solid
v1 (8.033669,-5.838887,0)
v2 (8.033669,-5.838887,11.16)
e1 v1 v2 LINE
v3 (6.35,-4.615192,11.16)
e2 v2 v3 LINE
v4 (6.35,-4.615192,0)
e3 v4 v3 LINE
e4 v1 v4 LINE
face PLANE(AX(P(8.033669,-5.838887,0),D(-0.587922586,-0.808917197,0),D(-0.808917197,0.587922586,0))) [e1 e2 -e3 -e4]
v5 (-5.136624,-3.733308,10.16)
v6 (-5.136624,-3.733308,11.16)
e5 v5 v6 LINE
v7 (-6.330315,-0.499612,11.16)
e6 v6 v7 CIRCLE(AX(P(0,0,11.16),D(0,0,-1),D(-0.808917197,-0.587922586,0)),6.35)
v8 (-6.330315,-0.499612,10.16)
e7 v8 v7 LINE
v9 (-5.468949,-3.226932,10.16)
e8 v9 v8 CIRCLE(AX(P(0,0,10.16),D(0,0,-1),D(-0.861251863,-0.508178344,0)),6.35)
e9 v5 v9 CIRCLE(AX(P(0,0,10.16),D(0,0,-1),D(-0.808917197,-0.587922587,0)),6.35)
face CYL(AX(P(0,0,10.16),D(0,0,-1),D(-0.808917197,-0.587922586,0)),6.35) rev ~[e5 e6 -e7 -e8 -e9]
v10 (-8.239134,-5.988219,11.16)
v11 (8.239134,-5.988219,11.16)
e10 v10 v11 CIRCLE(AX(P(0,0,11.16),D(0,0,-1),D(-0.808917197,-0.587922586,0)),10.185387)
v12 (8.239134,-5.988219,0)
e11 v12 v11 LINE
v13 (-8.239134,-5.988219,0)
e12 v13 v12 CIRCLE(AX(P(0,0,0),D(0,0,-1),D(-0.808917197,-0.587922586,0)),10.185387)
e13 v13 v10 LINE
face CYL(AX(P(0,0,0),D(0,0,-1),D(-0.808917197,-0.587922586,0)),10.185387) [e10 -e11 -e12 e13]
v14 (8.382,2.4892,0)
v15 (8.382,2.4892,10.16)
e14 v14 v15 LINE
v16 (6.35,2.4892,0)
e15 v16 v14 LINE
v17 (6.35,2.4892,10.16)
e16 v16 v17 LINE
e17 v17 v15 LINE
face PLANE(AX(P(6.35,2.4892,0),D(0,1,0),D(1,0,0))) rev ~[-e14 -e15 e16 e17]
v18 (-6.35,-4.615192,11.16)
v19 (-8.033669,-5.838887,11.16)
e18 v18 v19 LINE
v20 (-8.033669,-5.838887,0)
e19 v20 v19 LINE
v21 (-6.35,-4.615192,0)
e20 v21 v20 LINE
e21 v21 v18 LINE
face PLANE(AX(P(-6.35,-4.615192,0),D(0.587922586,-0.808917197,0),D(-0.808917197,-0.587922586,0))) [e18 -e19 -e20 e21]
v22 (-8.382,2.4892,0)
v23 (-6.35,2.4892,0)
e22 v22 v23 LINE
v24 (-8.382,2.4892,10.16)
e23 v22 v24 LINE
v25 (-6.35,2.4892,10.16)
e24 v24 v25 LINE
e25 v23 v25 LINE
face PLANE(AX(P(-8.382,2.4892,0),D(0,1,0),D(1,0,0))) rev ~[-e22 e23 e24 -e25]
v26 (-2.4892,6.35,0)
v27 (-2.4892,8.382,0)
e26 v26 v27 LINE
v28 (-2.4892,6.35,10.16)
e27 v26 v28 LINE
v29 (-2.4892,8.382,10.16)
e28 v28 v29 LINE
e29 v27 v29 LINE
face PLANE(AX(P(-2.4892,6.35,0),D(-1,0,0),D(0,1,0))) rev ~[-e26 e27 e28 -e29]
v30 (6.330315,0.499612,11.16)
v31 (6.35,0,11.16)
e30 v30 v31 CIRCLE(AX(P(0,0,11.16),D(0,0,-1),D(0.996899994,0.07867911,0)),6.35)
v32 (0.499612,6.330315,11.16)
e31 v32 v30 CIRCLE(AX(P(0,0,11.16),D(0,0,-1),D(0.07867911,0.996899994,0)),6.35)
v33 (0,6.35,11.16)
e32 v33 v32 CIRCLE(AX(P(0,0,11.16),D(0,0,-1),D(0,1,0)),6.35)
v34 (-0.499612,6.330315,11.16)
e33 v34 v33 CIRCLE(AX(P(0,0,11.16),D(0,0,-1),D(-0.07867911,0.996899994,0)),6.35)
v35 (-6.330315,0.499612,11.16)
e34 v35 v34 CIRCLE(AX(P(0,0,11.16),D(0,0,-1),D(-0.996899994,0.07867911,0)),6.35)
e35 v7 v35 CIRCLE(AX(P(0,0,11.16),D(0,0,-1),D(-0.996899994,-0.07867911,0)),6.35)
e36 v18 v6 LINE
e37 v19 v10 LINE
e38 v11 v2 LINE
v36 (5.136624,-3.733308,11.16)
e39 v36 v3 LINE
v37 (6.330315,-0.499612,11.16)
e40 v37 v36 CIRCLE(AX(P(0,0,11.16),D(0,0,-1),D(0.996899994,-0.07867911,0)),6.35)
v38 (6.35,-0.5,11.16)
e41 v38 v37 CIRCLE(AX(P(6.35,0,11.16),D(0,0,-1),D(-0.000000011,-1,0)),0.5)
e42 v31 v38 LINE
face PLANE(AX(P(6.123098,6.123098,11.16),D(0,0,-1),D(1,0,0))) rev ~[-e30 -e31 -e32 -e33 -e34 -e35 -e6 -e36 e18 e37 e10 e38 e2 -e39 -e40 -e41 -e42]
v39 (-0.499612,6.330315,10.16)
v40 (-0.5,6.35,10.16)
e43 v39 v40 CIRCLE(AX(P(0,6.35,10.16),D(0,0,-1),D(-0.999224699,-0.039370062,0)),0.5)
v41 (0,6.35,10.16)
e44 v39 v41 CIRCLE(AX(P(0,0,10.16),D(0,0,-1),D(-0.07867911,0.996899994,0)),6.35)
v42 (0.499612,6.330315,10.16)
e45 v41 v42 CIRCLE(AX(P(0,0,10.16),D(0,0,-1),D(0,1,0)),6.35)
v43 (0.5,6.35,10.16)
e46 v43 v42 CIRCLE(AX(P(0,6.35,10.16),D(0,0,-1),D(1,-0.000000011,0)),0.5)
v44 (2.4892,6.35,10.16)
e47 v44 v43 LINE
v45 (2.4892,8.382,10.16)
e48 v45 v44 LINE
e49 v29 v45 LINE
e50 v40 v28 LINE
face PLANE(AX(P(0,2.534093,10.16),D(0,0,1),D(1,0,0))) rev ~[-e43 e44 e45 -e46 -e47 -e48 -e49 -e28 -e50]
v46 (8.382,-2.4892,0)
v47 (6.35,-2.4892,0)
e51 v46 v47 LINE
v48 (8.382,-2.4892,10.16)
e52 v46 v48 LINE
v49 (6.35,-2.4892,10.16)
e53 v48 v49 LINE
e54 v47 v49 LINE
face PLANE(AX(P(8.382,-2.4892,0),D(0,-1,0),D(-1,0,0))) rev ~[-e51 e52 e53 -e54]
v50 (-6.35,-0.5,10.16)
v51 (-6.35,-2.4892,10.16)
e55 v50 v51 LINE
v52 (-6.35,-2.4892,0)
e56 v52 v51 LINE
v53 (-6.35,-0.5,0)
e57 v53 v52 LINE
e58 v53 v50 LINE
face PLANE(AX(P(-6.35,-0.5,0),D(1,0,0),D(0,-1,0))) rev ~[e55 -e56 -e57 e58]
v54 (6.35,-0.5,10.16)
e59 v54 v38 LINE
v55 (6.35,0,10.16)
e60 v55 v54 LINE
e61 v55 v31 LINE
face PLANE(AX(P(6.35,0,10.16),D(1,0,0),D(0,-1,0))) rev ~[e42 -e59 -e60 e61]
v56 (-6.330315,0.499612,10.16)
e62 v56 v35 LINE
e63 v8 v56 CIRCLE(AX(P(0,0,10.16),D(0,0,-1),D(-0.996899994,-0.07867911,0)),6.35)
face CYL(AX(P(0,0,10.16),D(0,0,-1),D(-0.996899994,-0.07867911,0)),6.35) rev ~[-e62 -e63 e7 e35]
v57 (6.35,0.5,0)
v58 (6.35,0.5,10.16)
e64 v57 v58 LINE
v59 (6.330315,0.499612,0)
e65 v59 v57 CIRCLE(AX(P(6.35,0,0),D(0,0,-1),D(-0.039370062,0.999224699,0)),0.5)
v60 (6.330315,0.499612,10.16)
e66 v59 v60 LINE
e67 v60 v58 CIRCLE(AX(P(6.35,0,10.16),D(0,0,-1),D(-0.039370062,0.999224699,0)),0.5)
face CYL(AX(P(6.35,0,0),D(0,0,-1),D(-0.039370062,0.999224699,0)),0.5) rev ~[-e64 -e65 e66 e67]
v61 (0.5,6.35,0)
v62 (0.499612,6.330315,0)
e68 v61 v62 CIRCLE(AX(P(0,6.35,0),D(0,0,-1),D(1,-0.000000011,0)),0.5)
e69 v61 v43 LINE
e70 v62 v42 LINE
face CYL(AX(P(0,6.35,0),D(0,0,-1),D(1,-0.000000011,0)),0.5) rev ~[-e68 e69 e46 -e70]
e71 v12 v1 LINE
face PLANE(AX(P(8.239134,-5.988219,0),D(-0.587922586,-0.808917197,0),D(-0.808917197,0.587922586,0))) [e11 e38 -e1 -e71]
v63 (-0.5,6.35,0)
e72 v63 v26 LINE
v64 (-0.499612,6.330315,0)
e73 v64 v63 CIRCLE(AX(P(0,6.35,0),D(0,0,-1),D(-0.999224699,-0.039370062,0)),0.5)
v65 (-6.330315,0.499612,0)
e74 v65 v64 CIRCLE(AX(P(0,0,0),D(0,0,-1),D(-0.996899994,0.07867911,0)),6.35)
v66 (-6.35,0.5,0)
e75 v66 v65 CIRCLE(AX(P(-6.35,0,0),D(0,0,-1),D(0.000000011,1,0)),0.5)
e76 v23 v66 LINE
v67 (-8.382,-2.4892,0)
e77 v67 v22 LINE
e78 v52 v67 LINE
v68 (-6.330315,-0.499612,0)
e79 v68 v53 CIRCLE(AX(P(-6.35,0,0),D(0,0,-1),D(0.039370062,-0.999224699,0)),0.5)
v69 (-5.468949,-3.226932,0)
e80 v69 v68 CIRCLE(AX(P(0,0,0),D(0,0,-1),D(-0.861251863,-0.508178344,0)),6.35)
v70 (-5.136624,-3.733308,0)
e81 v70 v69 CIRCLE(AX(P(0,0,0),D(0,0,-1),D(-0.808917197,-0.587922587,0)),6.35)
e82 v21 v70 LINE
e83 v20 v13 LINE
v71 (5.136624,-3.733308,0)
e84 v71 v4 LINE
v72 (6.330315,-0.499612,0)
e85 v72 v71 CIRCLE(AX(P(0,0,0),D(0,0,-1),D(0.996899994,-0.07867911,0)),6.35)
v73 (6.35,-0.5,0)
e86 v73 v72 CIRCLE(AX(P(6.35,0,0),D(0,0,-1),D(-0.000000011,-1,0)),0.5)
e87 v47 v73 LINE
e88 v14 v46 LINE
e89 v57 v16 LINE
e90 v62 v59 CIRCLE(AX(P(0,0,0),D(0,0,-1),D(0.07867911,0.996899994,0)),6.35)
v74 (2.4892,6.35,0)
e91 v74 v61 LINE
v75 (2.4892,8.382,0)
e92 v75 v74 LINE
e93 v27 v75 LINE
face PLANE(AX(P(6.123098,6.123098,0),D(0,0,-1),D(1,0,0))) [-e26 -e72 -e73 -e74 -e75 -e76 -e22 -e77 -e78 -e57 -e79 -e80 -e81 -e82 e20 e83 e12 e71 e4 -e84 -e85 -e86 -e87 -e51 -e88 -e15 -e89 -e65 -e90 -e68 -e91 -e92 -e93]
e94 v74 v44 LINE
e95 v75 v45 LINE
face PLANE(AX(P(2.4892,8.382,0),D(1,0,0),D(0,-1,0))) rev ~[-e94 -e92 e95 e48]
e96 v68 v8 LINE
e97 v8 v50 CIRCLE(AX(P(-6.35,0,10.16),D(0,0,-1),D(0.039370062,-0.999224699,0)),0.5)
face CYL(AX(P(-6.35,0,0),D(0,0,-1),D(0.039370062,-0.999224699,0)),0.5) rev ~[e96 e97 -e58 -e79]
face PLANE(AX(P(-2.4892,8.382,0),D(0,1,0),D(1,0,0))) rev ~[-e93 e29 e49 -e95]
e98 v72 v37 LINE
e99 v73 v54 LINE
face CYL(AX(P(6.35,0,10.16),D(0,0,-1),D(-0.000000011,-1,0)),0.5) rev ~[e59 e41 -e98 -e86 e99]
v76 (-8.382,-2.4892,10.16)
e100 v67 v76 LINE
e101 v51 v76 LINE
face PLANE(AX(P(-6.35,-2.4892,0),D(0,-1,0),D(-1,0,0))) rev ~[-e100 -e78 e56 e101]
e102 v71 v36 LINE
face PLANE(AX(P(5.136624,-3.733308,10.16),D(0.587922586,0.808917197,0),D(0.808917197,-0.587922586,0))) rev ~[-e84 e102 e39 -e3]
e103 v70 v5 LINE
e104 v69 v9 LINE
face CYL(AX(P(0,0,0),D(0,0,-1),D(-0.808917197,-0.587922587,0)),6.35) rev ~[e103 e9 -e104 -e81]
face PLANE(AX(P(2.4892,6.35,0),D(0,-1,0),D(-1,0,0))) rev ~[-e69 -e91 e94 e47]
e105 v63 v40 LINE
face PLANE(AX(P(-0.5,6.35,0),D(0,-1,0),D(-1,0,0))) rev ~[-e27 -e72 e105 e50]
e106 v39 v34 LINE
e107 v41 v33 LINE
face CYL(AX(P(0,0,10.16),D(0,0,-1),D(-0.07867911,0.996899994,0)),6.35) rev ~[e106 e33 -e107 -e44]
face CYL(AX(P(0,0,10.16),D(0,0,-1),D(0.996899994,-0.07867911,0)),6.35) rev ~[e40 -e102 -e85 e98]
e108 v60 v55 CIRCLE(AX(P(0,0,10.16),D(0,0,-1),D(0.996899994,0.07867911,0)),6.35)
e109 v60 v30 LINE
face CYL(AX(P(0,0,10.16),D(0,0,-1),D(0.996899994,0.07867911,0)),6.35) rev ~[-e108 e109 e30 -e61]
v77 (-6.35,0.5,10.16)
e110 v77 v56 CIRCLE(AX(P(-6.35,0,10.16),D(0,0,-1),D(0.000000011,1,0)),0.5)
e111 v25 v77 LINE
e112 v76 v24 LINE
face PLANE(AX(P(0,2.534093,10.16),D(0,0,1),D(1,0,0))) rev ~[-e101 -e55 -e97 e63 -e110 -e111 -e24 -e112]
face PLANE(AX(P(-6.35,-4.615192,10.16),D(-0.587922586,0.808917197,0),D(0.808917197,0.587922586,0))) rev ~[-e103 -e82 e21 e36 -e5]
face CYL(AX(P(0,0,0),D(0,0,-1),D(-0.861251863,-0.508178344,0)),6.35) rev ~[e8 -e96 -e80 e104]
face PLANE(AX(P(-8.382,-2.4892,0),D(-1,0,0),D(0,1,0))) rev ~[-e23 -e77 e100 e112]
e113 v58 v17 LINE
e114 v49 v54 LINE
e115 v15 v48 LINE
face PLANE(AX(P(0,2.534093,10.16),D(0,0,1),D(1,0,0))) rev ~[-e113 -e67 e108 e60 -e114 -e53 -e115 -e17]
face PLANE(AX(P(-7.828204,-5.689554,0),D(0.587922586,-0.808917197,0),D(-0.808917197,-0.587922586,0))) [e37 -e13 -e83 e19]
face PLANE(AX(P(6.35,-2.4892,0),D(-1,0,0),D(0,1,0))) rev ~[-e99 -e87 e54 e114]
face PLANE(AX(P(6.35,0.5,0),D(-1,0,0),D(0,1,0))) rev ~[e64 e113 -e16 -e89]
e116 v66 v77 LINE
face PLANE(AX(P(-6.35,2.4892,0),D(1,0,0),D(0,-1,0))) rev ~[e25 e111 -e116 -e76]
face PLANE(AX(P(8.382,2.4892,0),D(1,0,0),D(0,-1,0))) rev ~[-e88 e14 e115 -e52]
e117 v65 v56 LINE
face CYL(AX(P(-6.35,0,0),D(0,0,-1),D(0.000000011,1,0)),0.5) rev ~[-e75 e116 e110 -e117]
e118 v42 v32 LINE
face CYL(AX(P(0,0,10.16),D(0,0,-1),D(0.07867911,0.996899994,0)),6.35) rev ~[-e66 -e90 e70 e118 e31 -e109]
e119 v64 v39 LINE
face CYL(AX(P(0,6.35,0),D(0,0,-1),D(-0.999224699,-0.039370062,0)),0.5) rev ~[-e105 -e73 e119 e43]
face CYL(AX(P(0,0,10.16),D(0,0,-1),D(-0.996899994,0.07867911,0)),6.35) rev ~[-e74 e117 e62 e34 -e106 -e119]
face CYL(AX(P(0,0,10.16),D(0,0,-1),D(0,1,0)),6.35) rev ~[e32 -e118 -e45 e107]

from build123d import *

# Parameters (mm, degrees)
F1_DEPTH = 10.16
F2_R     = 3
F4_DEPTH = 1
F6_DEPTH = 11.16
F8_DEPTH = 11.16


with BuildPart() as f1:
    # F0 (on Top) → F1 (new body)
    with BuildSketch(Plane.XY):
        with BuildLine():
            Line((2.4892, 8.382), (2.4892, 6.35))
            Line((2.4892, 6.35), (0.5, 6.35))
            ThreePointArc((0.5, 6.35), (0.4999030778, 6.340155572), (0.499612349, 6.3303149606))
            ThreePointArc((0.499612349, 6.3303149606), (4.4901280605, 4.4901280605), (6.3303149606, 0.499612349))
            ThreePointArc((6.3303149606, 0.499612349), (6.340155572, 0.4999030778), (6.35, 0.5))
            Line((6.35, 0.5), (6.35, 2.4892))
            Line((6.35, 2.4892), (8.382, 2.4892))
            Line((8.382, 2.4892), (8.382, -2.4892))
            Line((8.382, -2.4892), (6.35, -2.4892))
            Line((6.35, -2.4892), (6.35, -0.5))
            ThreePointArc((6.35, -0.5), (6.340155572, -0.4999030778), (6.3303149606, -0.499612349))
            ThreePointArc((6.3303149606, -0.499612349), (5.9570857831, -2.1990063604), (5.1366242038, -3.733308424))
            Line((5.1366242038, -3.733308424), (6.35, -4.6151923037))
            ThreePointArc((6.35, -4.6151923037), (6.5628814967, -4.3070972197), (6.760827121, -3.9892))
            Line((6.760827121, -3.9892), (9.882, -3.9892))
            Line((9.882, -3.9892), (9.882, 3.9892))
            Line((9.882, 3.9892), (6.760827121, 3.9892))
            ThreePointArc((6.760827121, 3.9892), (5.5507882323, 5.5507882323), (3.9892, 6.760827121))
            Line((3.9892, 6.760827121), (3.9892, 9.882))
            Line((3.9892, 9.882), (-3.9892, 9.882))
            Line((-3.9892, 9.882), (-3.9892, 6.760827121))
            ThreePointArc((-3.9892, 6.760827121), (-5.5507882323, 5.5507882323), (-6.760827121, 3.9892))
            Line((-6.760827121, 3.9892), (-9.882, 3.9892))
            Line((-9.882, 3.9892), (-9.882, -3.9892))
            Line((-9.882, -3.9892), (-6.760827121, -3.9892))
            ThreePointArc((-6.760827121, -3.9892), (-6.5628814967, -4.3070972197), (-6.35, -4.6151923037))
            Line((-6.35, -4.6151923037), (-5.1366242038, -3.733308424))
            ThreePointArc((-5.1366242038, -3.733308424), (-5.3088277076, -3.4840850121), (-5.4689493272, -3.2269324841))
            ThreePointArc((-5.4689493272, -3.2269324841), (-6.0551819306, -1.9123994841), (-6.3303149606, -0.499612349))
            ThreePointArc((-6.3303149606, -0.499612349), (-6.340155572, -0.4999030778), (-6.35, -0.5))
            Line((-6.35, -0.5), (-6.35, -2.4892))
            Line((-6.35, -2.4892), (-8.382, -2.4892))
            Line((-8.382, -2.4892), (-8.382, 2.4892))
            Line((-8.382, 2.4892), (-6.35, 2.4892))
            Line((-6.35, 2.4892), (-6.35, 0.5))
            ThreePointArc((-6.35, 0.5), (-6.340155572, 0.4999030778), (-6.3303149606, 0.499612349))
            ThreePointArc((-6.3303149606, 0.499612349), (-4.4901280605, 4.4901280605), (-0.499612349, 6.3303149606))
            ThreePointArc((-0.499612349, 6.3303149606), (-0.4999030778, 6.340155572), (-0.5, 6.35))
            Line((-0.5, 6.35), (-2.4892, 6.35))
            Line((-2.4892, 6.35), (-2.4892, 8.382))
            Line((-2.4892, 8.382), (2.4892, 8.382))
        make_face()
    extrude(amount=F1_DEPTH)

    # F2
    f2_edges = [f1.edges().sort_by_distance(p)[0] for p in [
        (-3.9892, 9.882, 5.08),
        (3.9892, 9.882, 5.08),
        (-9.882, 3.9892, 5.08),
        (-9.882, -3.9892, 5.08),
        (9.882, 3.9892, 5.08),
        (9.882, -3.9892, 5.08),
    ]]
    fillet(f2_edges, radius=F2_R)

    # F3 (on face) → F4 (join)
    with BuildSketch(Plane.XY.offset(10.16)):
        with BuildLine():
            ThreePointArc((-3.9892, 6.760827121), (-5.5507882323, 5.5507882323), (-6.760827121, 3.9892))
            Line((-6.760827121, 3.9892), (-6.882, 3.9892))
            ThreePointArc((-6.882, 3.9892), (-9.0033203436, 3.1105203436), (-9.882, 0.9892))
            Line((-9.882, 0.9892), (-9.882, -0.9892))
            ThreePointArc((-9.882, -0.9892), (-9.0033203436, -3.1105203436), (-6.882, -3.9892))
            Line((-6.882, -3.9892), (-6.760827121, -3.9892))
            ThreePointArc((-6.760827121, -3.9892), (-6.5628814967, -4.3070972197), (-6.35, -4.6151923037))
            Line((-6.35, -4.6151923037), (-5.1366242038, -3.733308424))
            ThreePointArc((-5.1366242038, -3.733308424), (-5.9570857831, -2.1990063604), (-6.3303149606, -0.499612349))
            ThreePointArc((-6.3303149606, -0.499612349), (-6.340155572, -0.4999030778), (-6.35, -0.5))
            Line((-6.35, -0.5), (-6.35, -2.4892))
            Line((-6.35, -2.4892), (-8.382, -2.4892))
            Line((-8.382, -2.4892), (-8.382, 2.4892))
            Line((-8.382, 2.4892), (-6.35, 2.4892))
            Line((-6.35, 2.4892), (-6.35, 0.5))
            ThreePointArc((-6.35, 0.5), (-6.340155572, 0.4999030778), (-6.3303149606, 0.499612349))
            ThreePointArc((-6.3303149606, 0.499612349), (-4.4901280605, 4.4901280605), (-0.499612349, 6.3303149606))
            ThreePointArc((-0.499612349, 6.3303149606), (-0.4999030778, 6.340155572), (-0.5, 6.35))
            Line((-0.5, 6.35), (-2.4892, 6.35))
            Line((-2.4892, 6.35), (-2.4892, 8.382))
            Line((-2.4892, 8.382), (2.4892, 8.382))
            Line((2.4892, 8.382), (2.4892, 6.35))
            Line((2.4892, 6.35), (0.5, 6.35))
            ThreePointArc((0.5, 6.35), (0.4999030778, 6.340155572), (0.499612349, 6.3303149606))
            ThreePointArc((0.499612349, 6.3303149606), (4.4901280605, 4.4901280605), (6.3303149606, 0.499612349))
            ThreePointArc((6.3303149606, 0.499612349), (6.340155572, 0.4999030778), (6.35, 0.5))
            Line((6.35, 0.5), (6.35, 2.4892))
            Line((6.35, 2.4892), (8.382, 2.4892))
            Line((8.382, 2.4892), (8.382, -2.4892))
            Line((8.382, -2.4892), (6.35, -2.4892))
            Line((6.35, -2.4892), (6.35, -0.5))
            ThreePointArc((6.35, -0.5), (6.340155572, -0.4999030778), (6.3303149606, -0.499612349))
            ThreePointArc((6.3303149606, -0.499612349), (5.9570857831, -2.1990063604), (5.1366242038, -3.733308424))
            Line((5.1366242038, -3.733308424), (6.35, -4.6151923037))
            ThreePointArc((6.35, -4.6151923037), (6.5628814967, -4.3070972197), (6.760827121, -3.9892))
            Line((6.760827121, -3.9892), (6.882, -3.9892))
            ThreePointArc((6.882, -3.9892), (9.0033203436, -3.1105203436), (9.882, -0.9892))
            Line((9.882, -0.9892), (9.882, 0.9892))
            ThreePointArc((9.882, 0.9892), (9.0033203436, 3.1105203436), (6.882, 3.9892))
            Line((6.882, 3.9892), (6.760827121, 3.9892))
            ThreePointArc((6.760827121, 3.9892), (5.5507882323, 5.5507882323), (3.9892, 6.760827121))
            Line((3.9892, 6.760827121), (3.9892, 6.882))
            ThreePointArc((3.9892, 6.882), (3.1105203436, 9.0033203436), (0.9892, 9.882))
            Line((0.9892, 9.882), (-0.9892, 9.882))
            ThreePointArc((-0.9892, 9.882), (-3.1105203436, 9.0033203436), (-3.9892, 6.882))
            Line((-3.9892, 6.882), (-3.9892, 6.760827121))
        make_face()
        with BuildLine():
            ThreePointArc((-6.35, -0.5), (-6.340155572, -0.4999030778), (-6.3303149606, -0.499612349))
            ThreePointArc((-6.3303149606, -0.499612349), (-6.35, 0), (-6.3303149606, 0.499612349))
            ThreePointArc((-6.3303149606, 0.499612349), (-6.340155572, 0.4999030778), (-6.35, 0.5))
            Line((-6.35, 0.5), (-6.35, 2.4892))
            Line((-6.35, 2.4892), (-8.382, 2.4892))
            Line((-8.382, 2.4892), (-8.382, -2.4892))
            Line((-8.382, -2.4892), (-6.35, -2.4892))
            Line((-6.35, -2.4892), (-6.35, -0.5))
        make_face()
        with BuildLine():
            ThreePointArc((-0.5, 6.35), (-0.4999030778, 6.340155572), (-0.499612349, 6.3303149606))
            ThreePointArc((-0.499612349, 6.3303149606), (-0.25, 6.3450768317), (0, 6.35))
            ThreePointArc((0, 6.35), (0.25, 6.3450768317), (0.499612349, 6.3303149606))
            ThreePointArc((0.499612349, 6.3303149606), (0.4999030778, 6.340155572), (0.5, 6.35))
            Line((0.5, 6.35), (2.4892, 6.35))
            Line((2.4892, 6.35), (2.4892, 8.382))
            Line((2.4892, 8.382), (-2.4892, 8.382))
            Line((-2.4892, 8.382), (-2.4892, 6.35))
            Line((-2.4892, 6.35), (-0.5, 6.35))
        make_face()
        with BuildLine():
            ThreePointArc((6.35, 0.5), (6.340155572, 0.4999030778), (6.3303149606, 0.499612349))
            ThreePointArc((6.3303149606, 0.499612349), (6.3450768317, 0.25), (6.35, 0))
            Line((6.35, 0), (6.35, -0.5))
            Line((6.35, -0.5), (6.35, -2.4892))
            Line((6.35, -2.4892), (8.382, -2.4892))
            Line((8.382, -2.4892), (8.382, 2.4892))
            Line((8.382, 2.4892), (6.35, 2.4892))
            Line((6.35, 2.4892), (6.35, 0.5))
        make_face()
    extrude(amount=F4_DEPTH)

    # F5 (on face) → F6 (join, through all)
    with BuildSketch(Plane(origin=(0, 0, 0), x_dir=(1, 0, 0), z_dir=(0, 0, -1))):
        with BuildLine():
            ThreePointArc((3.9892, -6.882), (3.3907514875, -8.6799294905), (1.8341663648, -9.7605468282))
            ThreePointArc((1.8341663648, -9.7605468282), (7.0225508414, -7.0225508414), (9.7605468282, -1.8341663648))
            ThreePointArc((9.7605468282, -1.8341663648), (8.6799294905, -3.3907514875), (6.882, -3.9892))
            Line((6.882, -3.9892), (6.760827121, -3.9892))
            ThreePointArc((6.760827121, -3.9892), (5.5507882323, -5.5507882323), (3.9892, -6.760827121))
            Line((3.9892, -6.760827121), (3.9892, -6.882))
        make_face()
        with BuildLine():
            ThreePointArc((6.882, 3.9892), (8.6799294905, 3.3907514875), (9.7605468282, 1.8341663648))
            ThreePointArc((9.7605468282, 1.8341663648), (9.1196479712, 3.9324879556), (8.0336694496, 5.8388865219))
            Line((8.0336694496, 5.8388865219), (6.35, 4.6151923037))
            ThreePointArc((6.35, 4.6151923037), (6.5628814967, 4.3070972197), (6.760827121, 3.9892))
            Line((6.760827121, 3.9892), (6.882, 3.9892))
        make_face()
        with BuildLine():
            ThreePointArc((-8.0336694496, 5.8388865219), (-9.1196479712, 3.9324879556), (-9.7605468282, 1.8341663648))
            ThreePointArc((-9.7605468282, 1.8341663648), (-8.6799294905, 3.3907514875), (-6.882, 3.9892))
            Line((-6.882, 3.9892), (-6.760827121, 3.9892))
            ThreePointArc((-6.760827121, 3.9892), (-6.5628814967, 4.3070972197), (-6.35, 4.6151923037))
            Line((-6.35, 4.6151923037), (-8.0336694496, 5.8388865219))
        make_face()
        with BuildLine():
            Line((-3.9892, -6.882), (-3.9892, -6.760827121))
            ThreePointArc((-3.9892, -6.760827121), (-5.5507882323, -5.5507882323), (-6.760827121, -3.9892))
            Line((-6.760827121, -3.9892), (-6.882, -3.9892))
            ThreePointArc((-6.882, -3.9892), (-8.6799294905, -3.3907514875), (-9.7605468282, -1.8341663648))
            ThreePointArc((-9.7605468282, -1.8341663648), (-7.0225508414, -7.0225508414), (-1.8341663648, -9.7605468282))
            ThreePointArc((-1.8341663648, -9.7605468282), (-3.3907514875, -8.6799294905), (-3.9892, -6.882))
        make_face()
    extrude(amount=-F6_DEPTH)

    # F7 (on face) → F8 (join, through all)
    with BuildSketch(Plane(origin=(0, 0, 0), x_dir=(1, 0, 0), z_dir=(0, 0, -1))):
        with BuildLine():
            Line((-7.8282044814, 5.6895541849), (-8.2391344177, 5.9882188588))
            ThreePointArc((-8.2391344177, 5.9882188588), (0, -10.1853866424), (8.2391344177, 5.9882188588))
            Line((8.2391344177, 5.9882188588), (7.8282044814, 5.6895541849))
            ThreePointArc((7.8282044814, 5.6895541849), (0, -9.6773866424), (-7.8282044814, 5.6895541849))
        make_face()
    extrude(amount=-F8_DEPTH)


solid = f1.part
